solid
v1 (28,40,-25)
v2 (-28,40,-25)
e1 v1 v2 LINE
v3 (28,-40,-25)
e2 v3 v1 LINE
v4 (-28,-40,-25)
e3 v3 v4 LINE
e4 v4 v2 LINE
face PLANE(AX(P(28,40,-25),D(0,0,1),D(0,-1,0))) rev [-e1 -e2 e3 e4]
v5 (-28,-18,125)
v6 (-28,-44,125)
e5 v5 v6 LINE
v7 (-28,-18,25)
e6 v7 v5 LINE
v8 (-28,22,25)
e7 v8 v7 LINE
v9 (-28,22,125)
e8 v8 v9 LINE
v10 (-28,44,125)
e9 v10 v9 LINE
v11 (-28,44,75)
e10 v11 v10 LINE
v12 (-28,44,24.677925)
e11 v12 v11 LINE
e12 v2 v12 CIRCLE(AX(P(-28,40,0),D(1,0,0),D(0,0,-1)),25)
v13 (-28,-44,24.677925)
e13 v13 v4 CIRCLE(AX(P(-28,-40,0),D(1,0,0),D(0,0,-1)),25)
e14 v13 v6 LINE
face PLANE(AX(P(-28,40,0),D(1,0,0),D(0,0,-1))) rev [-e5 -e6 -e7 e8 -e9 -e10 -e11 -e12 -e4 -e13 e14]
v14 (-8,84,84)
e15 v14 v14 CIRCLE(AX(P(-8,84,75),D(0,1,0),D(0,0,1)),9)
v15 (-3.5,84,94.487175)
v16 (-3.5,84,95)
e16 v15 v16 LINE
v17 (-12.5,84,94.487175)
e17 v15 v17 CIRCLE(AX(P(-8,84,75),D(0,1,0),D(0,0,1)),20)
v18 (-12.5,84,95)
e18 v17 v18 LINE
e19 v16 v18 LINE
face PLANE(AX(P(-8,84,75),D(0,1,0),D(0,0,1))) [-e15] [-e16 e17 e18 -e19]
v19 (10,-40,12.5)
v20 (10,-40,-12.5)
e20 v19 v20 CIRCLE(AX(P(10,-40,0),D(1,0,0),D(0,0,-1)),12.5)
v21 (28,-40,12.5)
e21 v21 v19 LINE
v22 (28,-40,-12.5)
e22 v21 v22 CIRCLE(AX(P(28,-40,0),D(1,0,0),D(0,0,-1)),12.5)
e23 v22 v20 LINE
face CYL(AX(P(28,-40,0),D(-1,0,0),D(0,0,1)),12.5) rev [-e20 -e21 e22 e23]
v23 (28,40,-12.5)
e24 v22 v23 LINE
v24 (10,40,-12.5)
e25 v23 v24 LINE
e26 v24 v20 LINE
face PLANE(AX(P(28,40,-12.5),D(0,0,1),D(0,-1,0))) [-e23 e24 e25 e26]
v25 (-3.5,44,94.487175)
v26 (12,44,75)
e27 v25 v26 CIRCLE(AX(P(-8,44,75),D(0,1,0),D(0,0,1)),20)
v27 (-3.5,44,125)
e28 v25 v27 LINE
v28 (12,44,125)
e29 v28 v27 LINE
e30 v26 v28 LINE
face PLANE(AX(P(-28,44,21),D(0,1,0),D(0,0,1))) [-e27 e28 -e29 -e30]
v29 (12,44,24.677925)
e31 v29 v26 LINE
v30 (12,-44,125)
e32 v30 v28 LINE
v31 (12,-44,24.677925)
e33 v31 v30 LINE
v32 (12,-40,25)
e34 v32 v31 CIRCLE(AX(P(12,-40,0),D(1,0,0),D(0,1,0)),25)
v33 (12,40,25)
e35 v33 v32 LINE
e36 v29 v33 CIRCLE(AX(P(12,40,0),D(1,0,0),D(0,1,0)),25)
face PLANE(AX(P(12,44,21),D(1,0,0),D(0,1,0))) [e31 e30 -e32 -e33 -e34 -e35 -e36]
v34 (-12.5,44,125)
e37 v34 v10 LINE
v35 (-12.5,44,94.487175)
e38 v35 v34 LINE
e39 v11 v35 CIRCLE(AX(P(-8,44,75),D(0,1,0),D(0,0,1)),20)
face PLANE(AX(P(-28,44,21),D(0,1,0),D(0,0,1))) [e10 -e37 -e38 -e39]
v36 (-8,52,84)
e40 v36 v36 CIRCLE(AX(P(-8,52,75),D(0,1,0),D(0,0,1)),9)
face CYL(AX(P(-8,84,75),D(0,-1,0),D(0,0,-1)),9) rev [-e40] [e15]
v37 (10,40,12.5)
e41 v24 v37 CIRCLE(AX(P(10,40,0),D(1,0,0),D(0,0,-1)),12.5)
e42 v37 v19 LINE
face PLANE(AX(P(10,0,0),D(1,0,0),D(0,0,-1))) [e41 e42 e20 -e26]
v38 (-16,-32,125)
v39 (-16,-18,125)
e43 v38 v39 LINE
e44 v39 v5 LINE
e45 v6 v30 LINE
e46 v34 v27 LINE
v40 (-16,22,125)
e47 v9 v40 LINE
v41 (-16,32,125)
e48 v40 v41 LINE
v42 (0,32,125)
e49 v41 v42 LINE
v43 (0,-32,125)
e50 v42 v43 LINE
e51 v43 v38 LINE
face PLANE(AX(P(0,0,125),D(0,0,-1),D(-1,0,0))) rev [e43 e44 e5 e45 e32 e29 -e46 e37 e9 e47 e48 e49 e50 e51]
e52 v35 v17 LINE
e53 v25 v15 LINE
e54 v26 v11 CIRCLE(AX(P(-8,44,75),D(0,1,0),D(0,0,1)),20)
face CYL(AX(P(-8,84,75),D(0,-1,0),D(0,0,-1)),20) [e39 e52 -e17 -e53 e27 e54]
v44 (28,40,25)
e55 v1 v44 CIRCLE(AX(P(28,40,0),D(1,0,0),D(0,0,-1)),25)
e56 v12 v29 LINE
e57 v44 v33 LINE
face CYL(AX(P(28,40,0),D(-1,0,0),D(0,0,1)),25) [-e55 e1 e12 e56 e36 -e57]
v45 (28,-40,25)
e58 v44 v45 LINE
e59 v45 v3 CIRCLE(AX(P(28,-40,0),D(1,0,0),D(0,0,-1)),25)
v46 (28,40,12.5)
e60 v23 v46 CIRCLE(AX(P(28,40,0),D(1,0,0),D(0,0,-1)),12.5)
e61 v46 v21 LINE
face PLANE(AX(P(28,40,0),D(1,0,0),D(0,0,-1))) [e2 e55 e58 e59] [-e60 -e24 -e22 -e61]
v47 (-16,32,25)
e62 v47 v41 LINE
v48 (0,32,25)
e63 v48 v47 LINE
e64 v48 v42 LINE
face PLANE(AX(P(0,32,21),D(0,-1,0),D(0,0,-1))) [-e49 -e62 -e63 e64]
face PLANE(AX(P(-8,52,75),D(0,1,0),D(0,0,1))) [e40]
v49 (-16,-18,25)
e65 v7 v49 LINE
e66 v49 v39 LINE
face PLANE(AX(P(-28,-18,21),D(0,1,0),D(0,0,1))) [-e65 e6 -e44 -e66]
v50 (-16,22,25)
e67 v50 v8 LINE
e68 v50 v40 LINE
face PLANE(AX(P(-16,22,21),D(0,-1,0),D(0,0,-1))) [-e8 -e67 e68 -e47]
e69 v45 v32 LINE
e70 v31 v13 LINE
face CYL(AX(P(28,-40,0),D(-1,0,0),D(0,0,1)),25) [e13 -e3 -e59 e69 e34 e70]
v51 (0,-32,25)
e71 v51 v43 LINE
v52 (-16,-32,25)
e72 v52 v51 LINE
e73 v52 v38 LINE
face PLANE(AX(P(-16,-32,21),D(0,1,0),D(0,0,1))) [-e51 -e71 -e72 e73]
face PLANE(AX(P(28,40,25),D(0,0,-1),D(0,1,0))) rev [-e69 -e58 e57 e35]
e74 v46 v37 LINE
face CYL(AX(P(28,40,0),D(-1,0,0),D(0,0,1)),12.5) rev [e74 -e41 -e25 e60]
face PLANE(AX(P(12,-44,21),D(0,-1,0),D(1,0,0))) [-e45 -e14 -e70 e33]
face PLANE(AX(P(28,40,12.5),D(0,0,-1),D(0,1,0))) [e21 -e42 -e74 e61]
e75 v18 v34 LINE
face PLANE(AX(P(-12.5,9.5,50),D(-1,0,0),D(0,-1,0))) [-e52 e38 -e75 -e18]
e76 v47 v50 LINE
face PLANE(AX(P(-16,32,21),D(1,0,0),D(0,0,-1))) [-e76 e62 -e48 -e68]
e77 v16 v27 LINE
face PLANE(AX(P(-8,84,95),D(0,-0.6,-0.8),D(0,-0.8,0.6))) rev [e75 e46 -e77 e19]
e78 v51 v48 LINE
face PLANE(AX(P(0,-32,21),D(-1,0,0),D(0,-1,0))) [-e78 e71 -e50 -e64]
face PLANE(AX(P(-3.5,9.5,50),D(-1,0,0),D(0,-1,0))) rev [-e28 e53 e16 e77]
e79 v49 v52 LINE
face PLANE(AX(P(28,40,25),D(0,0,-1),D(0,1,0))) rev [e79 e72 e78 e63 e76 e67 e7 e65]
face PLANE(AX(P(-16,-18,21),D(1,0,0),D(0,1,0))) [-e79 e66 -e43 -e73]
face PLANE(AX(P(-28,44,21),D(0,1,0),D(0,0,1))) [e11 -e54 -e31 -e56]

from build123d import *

# Parameters (mm, degrees)
BOSS_EXTRUDE1_DEPTH      = 28
BOSS_EXTRUDE2_DEPTH      = 10
BOSS_EXTRUDE2_DEPTH_BACK = 28
BOSS_EXTRUDE3_DEPTH      = 100
BOSS_EXTRUDE3_DEPTH_BACK = 4
SKETCH4_R                = 20
SKETCH4_R_2              = 9
BOSS_EXTRUDE4_DEPTH      = 40
SKETCH4_2_R              = 9
BOSS_EXTRUDE5_DEPTH      = 8
RIB2_START               = -4.5
RIB2_DEPTH               = 9


with BuildPart() as part:
    # Sketch1 → Boss-Extrude1 (new, symmetric)
    with BuildSketch(Plane(origin=(0, 0, 0), x_dir=(0, 0, -1), z_dir=(1, 0, 0))):
        with BuildLine():
            Line((25, 40), (25, -40))
            ThreePointArc((25, -40), (0, -65), (-25, -40))
            Line((-25, -40), (-25, 40))
            ThreePointArc((-25, 40), (0, 65), (25, 40))
        make_face()
        with BuildLine():
            Line((12.5, 40), (12.5, -40))
            ThreePointArc((12.5, -40), (0, -52.5), (-12.5, -40))
            Line((-12.5, -40), (-12.5, 40))
            ThreePointArc((-12.5, 40), (0, 52.5), (12.5, 40))
        make_face(mode=Mode.SUBTRACT)
    extrude(amount=BOSS_EXTRUDE1_DEPTH, both=True)

    # Sketch1<2> → Boss-Extrude2 (add, two sides: drawn at the far end of the back side and taken through both)
    with BuildSketch(Plane(origin=(0, 0, 0), x_dir=(0, 0, -1), z_dir=(1, 0, 0)).offset(-BOSS_EXTRUDE2_DEPTH_BACK)):
        with BuildLine():
            Line((-12.5, 40), (-12.5, -40))
            ThreePointArc((-12.5, -40), (0, -52.5), (12.5, -40))
            Line((12.5, -40), (12.5, 40))
            ThreePointArc((12.5, 40), (0, 52.5), (-12.5, 40))
        make_face()
    extrude(amount=BOSS_EXTRUDE2_DEPTH + BOSS_EXTRUDE2_DEPTH_BACK)

    # Sketch3 → Boss-Extrude3 (add, two sides: drawn at the far end of the back side and taken through both)
    with BuildSketch(Plane.XY.offset(25).offset(-BOSS_EXTRUDE3_DEPTH_BACK)):
        Polygon((-28, 44), (12, 44), (12, -44), (-28, -44), (-28, -18), (-16, -18), (-16, -32), (0, -32), (0, 32), (-16, 32), (-16, 22), (-28, 22), align=None)
    extrude(amount=BOSS_EXTRUDE3_DEPTH + BOSS_EXTRUDE3_DEPTH_BACK)

    # Sketch4 → Boss-Extrude4 (add)
    with BuildSketch(Plane(origin=(0, 44, 0), x_dir=(1, 0, 0), z_dir=(0, 1, 0))):
        with Locations(Location((-8, -75, 0), (0, 0, 180))):
            Circle(SKETCH4_R)
        with Locations(Location((-8, -75, 0), (0, 0, 270))):
            Circle(SKETCH4_R_2, mode=Mode.SUBTRACT)
    extrude(amount=BOSS_EXTRUDE4_DEPTH)

    # Sketch4<2> → Boss-Extrude5 (add)
    with BuildSketch(Plane(origin=(0, 44, 0), x_dir=(1, 0, 0), z_dir=(0, 1, 0))):
        with Locations(Location((-8, -75, 0), (0, 0, 270))):
            Circle(SKETCH4_2_R)
    extrude(amount=BOSS_EXTRUDE5_DEPTH)

    # Rib2: read off the stored shape, not the designer's step
    # Rib2 outline → Rib2 (add)
    with BuildSketch(Plane.ZY.offset(8).offset(RIB2_START)):
        Polygon((95, 84), (94.48717527, 84), (94.48717527, 44), (125, 44), align=None)
    extrude(amount=RIB2_DEPTH)


solid = part.part
